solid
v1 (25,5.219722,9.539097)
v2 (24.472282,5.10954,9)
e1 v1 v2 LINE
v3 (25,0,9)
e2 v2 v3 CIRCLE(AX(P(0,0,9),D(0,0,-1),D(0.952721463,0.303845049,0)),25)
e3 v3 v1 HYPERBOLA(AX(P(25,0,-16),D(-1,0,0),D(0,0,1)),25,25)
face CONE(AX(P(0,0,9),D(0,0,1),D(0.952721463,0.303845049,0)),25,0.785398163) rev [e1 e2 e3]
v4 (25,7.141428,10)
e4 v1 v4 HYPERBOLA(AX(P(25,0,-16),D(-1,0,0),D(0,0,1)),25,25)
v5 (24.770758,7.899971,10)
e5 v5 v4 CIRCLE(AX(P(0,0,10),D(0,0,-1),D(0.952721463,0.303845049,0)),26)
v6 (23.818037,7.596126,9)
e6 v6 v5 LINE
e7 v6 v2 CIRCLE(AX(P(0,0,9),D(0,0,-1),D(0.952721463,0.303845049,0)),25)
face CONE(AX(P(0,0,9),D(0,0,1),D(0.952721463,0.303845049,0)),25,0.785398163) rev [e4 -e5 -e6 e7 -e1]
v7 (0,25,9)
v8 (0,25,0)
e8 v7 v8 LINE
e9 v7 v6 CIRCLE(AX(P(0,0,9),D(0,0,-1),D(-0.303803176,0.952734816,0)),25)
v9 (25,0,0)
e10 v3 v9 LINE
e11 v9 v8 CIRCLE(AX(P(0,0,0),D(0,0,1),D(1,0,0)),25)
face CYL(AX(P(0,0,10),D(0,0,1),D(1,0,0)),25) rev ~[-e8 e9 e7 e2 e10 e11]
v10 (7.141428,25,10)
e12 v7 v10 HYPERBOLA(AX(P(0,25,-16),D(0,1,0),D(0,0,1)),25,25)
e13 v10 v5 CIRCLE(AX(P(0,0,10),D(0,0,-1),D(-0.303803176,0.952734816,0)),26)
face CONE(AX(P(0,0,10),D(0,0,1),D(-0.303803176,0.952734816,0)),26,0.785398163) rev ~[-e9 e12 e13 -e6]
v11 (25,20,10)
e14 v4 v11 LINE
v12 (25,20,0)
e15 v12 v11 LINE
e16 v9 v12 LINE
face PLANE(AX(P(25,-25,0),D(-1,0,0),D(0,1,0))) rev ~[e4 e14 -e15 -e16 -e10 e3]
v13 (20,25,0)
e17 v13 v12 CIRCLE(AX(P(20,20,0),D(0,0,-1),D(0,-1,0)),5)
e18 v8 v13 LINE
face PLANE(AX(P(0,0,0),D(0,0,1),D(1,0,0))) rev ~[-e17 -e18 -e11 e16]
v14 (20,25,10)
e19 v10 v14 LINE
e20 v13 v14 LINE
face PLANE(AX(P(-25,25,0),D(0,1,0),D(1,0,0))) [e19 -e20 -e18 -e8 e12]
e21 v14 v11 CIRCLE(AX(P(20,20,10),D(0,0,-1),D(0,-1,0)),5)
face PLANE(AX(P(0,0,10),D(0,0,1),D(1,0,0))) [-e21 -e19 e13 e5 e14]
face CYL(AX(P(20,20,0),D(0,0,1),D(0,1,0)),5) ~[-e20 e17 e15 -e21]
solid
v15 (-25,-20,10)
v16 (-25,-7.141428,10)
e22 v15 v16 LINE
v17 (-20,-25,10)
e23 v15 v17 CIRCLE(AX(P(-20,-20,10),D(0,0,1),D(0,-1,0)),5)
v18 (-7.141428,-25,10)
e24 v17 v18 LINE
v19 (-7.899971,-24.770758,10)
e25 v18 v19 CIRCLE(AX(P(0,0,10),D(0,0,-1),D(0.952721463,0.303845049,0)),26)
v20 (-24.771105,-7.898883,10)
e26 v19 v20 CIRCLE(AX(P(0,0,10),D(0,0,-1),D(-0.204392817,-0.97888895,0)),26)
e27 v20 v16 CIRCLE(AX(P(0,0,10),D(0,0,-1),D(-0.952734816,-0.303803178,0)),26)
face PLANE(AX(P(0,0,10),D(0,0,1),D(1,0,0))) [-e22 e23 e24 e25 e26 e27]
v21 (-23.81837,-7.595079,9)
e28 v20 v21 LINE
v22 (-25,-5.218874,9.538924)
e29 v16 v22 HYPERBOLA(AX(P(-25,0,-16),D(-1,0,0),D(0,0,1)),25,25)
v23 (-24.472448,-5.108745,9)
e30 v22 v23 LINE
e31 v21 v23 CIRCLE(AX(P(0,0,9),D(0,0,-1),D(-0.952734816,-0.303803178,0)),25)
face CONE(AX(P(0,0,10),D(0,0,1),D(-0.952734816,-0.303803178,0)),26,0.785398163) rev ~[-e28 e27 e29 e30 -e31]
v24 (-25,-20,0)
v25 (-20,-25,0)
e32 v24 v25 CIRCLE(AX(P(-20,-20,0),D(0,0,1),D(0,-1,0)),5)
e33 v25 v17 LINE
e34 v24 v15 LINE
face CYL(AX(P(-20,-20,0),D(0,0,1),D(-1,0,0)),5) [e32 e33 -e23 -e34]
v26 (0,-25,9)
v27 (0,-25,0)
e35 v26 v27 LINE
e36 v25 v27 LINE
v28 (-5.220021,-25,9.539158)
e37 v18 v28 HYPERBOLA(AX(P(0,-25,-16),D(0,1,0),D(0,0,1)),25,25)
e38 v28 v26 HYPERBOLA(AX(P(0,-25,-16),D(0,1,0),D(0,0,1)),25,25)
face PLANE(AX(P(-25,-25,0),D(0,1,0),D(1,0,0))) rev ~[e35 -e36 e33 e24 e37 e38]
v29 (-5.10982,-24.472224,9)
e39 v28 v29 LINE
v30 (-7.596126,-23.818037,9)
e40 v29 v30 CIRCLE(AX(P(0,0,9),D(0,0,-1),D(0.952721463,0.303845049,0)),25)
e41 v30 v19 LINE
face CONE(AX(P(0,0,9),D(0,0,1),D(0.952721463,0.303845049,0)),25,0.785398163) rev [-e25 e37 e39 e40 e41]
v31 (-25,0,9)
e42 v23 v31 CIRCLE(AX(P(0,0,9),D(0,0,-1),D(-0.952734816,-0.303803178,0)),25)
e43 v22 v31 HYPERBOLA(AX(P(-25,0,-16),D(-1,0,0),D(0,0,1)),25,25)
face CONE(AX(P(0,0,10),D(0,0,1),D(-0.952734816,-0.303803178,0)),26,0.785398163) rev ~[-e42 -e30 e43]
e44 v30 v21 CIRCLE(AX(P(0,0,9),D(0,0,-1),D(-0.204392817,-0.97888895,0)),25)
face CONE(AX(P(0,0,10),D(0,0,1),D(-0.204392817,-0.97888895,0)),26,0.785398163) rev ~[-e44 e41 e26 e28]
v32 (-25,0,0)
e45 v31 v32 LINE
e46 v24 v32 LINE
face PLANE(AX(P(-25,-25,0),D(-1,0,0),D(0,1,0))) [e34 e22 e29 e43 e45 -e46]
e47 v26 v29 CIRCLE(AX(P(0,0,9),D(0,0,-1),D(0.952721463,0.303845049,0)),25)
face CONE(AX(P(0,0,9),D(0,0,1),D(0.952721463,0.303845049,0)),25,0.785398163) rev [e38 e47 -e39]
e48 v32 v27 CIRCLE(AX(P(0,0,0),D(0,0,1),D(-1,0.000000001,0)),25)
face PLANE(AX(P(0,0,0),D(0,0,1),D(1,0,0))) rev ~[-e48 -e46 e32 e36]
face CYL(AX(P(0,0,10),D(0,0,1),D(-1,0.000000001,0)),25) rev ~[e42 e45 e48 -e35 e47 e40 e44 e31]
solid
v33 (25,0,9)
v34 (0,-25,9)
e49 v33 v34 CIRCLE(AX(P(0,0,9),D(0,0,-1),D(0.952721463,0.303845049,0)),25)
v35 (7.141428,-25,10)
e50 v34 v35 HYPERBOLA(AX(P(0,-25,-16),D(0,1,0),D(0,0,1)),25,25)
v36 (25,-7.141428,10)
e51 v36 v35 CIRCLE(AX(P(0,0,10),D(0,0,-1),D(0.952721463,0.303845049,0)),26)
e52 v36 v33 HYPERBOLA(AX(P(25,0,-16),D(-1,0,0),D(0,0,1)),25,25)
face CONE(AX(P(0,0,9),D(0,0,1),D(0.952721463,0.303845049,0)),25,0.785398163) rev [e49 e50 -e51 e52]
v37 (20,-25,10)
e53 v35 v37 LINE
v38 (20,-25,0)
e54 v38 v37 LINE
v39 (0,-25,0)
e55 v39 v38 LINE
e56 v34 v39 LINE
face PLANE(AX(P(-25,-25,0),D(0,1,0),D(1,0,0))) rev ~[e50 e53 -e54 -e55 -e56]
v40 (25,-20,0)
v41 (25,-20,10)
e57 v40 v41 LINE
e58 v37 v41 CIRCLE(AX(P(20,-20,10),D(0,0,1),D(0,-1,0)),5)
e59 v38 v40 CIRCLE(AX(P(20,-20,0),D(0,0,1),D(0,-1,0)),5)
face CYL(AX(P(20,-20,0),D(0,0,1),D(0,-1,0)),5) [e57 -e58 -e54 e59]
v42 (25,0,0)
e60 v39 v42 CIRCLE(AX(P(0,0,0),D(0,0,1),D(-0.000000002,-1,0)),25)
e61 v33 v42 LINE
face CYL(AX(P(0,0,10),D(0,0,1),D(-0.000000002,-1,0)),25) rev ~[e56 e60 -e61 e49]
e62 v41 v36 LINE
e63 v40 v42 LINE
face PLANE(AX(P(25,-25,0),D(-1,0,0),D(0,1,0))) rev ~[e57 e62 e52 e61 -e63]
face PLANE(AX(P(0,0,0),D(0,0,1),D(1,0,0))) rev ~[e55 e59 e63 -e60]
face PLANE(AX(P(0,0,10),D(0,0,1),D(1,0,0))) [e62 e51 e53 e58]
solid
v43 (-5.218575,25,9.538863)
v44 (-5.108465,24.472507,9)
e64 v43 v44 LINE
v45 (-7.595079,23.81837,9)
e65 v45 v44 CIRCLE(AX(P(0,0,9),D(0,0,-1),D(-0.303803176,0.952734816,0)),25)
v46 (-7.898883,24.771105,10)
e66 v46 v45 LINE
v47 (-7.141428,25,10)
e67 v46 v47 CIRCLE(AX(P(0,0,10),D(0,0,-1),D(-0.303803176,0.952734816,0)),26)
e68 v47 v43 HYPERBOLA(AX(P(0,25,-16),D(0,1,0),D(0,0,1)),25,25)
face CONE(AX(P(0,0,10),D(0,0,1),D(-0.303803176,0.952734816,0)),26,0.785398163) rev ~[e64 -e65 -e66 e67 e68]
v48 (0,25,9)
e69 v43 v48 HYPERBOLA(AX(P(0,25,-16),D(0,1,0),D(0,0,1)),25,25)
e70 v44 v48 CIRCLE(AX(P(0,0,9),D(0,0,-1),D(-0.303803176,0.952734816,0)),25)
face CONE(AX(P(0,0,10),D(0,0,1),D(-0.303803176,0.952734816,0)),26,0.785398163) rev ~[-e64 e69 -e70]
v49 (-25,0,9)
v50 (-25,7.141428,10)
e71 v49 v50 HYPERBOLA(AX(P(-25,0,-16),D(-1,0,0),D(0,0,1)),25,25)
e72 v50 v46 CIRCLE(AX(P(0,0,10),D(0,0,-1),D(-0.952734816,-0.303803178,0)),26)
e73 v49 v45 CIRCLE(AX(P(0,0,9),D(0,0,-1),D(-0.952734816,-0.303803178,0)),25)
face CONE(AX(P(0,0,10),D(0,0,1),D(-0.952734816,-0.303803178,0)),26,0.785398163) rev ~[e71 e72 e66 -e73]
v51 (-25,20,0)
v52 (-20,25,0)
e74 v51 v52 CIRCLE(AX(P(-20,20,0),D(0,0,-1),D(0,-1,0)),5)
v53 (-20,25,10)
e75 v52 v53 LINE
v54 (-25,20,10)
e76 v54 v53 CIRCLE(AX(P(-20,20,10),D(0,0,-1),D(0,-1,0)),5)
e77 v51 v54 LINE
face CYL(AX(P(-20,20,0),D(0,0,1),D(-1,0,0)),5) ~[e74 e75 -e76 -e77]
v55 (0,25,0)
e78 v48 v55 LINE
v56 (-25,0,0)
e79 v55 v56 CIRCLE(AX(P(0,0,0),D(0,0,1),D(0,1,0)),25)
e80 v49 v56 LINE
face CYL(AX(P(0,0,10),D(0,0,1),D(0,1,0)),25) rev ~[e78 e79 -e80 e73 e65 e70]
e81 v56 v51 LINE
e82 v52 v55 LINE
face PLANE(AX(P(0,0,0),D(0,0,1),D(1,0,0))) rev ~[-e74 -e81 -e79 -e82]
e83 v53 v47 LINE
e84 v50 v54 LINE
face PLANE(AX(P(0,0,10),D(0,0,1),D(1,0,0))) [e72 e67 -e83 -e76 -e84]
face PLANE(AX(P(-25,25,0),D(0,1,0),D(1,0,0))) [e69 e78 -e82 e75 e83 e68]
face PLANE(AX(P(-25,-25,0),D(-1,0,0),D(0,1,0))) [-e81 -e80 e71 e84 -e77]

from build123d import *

# Parameters (mm, degrees)
F0_W           = 50
F0_H           = 50
F1_DEPTH       = 10
F3_DEPTH       = 10.001
F4_R           = 5
F5_T2_ANGLE    = 125.3773855197
F5_S1_T2_ANGLE = 95.892873339
F5_S2_T2_ANGLE = 95.8953917499
F5_S3_T2_ANGLE = 66.4146031024


# Not quite as in the source:
# - a fillet or chamfer that OpenCascade refuses, or shapes differently, is made with other operations: its cross-section is extruded or revolved along the edge and cut away or added


with BuildPart() as f1:
    # F0 (on Top) → F1 (new body)
    with BuildSketch(Plane.XY):
        Rectangle(F0_W, F0_H)
    extrude(amount=F1_DEPTH)

    # F2 (on face) → F3 (cut, through all)
    with BuildSketch(Plane.XY.offset(10)):
        with BuildLine():
            ThreePointArc((-5.83e-08, -25), (17.677669509, -17.6776695503), (25, 0))
            ThreePointArc((25, 0), (17.6776695297, 17.6776695297), (0, 25))
            ThreePointArc((0, 25), (-17.6776695204, 17.6776695389), (-25, 2.61e-08))
            ThreePointArc((-25, 2.61e-08), (-17.6776695595, -17.6776694998), (-5.83e-08, -25))
        make_face()
    extrude(amount=-F3_DEPTH, mode=Mode.SUBTRACT)

    # F4
    f4_edges = [f1.edges().sort_by_distance(p)[0] for p in [
        (25, -25, 5),
        (25, 25, 5),
        (-25, 25, 5),
        (-25, -25, 5),
    ]]
    fillet(f4_edges, radius=F4_R)

    # F5: chamfer of 1 on 1 edges, made by hand

    # F5_s1 → F5_t2 (revolve, cut)
    with BuildSketch(Plane(origin=(0, 0, 0), x_dir=(0, 0, 1), z_dir=(-0.3038450488, 0.9527214631, 0))):
        Polygon((9, 25), (10, 26), (10, 25), align=None)
    revolve(axis=Axis((0, 0, 10), (0, 0, -1)), revolution_arc=F5_T2_ANGLE, mode=Mode.SUBTRACT)

    # F5#s1: chamfer of 1 on 1 edges, made by hand

    # F5_s1_s1 → F5_s1_t2 (revolve, cut)
    with BuildSketch(Plane(origin=(0, 0, 0), x_dir=(0, 0, 1), z_dir=(-0.9527348163, -0.3038031761, 0))):
        Polygon((10, 26), (9, 25), (10, 25), align=None)
    revolve(axis=Axis((0, 0, 10), (0, 0, -1)), revolution_arc=F5_S1_T2_ANGLE, mode=Mode.SUBTRACT)

    # F5#s2: chamfer of 1 on 1 edges, made by hand

    # F5_s2_s1 → F5_s2_t2 (revolve, cut)
    with BuildSketch(Plane(origin=(0, 0, 0), x_dir=(0, 0, 1), z_dir=(0.3038031783, -0.9527348156, 0))):
        Polygon((10, 26), (9, 25), (10, 25), align=None)
    revolve(axis=Axis((0, 0, 10), (0, 0, -1)), revolution_arc=F5_S2_T2_ANGLE, mode=Mode.SUBTRACT)

    # F5#s3: chamfer of 1 on 1 edges, made by hand

    # F5_s3_s1 → F5_s3_t2 (revolve, cut)
    with BuildSketch(Plane(origin=(0, 0, 0), x_dir=(0, 0, 1), z_dir=(0.9788889499, -0.2043928171, 0))):
        Polygon((10, 26), (9, 25), (10, 25), align=None)
    revolve(axis=Axis((0, 0, 10), (0, 0, -1)), revolution_arc=F5_S3_T2_ANGLE, mode=Mode.SUBTRACT)


solid = f1.part
